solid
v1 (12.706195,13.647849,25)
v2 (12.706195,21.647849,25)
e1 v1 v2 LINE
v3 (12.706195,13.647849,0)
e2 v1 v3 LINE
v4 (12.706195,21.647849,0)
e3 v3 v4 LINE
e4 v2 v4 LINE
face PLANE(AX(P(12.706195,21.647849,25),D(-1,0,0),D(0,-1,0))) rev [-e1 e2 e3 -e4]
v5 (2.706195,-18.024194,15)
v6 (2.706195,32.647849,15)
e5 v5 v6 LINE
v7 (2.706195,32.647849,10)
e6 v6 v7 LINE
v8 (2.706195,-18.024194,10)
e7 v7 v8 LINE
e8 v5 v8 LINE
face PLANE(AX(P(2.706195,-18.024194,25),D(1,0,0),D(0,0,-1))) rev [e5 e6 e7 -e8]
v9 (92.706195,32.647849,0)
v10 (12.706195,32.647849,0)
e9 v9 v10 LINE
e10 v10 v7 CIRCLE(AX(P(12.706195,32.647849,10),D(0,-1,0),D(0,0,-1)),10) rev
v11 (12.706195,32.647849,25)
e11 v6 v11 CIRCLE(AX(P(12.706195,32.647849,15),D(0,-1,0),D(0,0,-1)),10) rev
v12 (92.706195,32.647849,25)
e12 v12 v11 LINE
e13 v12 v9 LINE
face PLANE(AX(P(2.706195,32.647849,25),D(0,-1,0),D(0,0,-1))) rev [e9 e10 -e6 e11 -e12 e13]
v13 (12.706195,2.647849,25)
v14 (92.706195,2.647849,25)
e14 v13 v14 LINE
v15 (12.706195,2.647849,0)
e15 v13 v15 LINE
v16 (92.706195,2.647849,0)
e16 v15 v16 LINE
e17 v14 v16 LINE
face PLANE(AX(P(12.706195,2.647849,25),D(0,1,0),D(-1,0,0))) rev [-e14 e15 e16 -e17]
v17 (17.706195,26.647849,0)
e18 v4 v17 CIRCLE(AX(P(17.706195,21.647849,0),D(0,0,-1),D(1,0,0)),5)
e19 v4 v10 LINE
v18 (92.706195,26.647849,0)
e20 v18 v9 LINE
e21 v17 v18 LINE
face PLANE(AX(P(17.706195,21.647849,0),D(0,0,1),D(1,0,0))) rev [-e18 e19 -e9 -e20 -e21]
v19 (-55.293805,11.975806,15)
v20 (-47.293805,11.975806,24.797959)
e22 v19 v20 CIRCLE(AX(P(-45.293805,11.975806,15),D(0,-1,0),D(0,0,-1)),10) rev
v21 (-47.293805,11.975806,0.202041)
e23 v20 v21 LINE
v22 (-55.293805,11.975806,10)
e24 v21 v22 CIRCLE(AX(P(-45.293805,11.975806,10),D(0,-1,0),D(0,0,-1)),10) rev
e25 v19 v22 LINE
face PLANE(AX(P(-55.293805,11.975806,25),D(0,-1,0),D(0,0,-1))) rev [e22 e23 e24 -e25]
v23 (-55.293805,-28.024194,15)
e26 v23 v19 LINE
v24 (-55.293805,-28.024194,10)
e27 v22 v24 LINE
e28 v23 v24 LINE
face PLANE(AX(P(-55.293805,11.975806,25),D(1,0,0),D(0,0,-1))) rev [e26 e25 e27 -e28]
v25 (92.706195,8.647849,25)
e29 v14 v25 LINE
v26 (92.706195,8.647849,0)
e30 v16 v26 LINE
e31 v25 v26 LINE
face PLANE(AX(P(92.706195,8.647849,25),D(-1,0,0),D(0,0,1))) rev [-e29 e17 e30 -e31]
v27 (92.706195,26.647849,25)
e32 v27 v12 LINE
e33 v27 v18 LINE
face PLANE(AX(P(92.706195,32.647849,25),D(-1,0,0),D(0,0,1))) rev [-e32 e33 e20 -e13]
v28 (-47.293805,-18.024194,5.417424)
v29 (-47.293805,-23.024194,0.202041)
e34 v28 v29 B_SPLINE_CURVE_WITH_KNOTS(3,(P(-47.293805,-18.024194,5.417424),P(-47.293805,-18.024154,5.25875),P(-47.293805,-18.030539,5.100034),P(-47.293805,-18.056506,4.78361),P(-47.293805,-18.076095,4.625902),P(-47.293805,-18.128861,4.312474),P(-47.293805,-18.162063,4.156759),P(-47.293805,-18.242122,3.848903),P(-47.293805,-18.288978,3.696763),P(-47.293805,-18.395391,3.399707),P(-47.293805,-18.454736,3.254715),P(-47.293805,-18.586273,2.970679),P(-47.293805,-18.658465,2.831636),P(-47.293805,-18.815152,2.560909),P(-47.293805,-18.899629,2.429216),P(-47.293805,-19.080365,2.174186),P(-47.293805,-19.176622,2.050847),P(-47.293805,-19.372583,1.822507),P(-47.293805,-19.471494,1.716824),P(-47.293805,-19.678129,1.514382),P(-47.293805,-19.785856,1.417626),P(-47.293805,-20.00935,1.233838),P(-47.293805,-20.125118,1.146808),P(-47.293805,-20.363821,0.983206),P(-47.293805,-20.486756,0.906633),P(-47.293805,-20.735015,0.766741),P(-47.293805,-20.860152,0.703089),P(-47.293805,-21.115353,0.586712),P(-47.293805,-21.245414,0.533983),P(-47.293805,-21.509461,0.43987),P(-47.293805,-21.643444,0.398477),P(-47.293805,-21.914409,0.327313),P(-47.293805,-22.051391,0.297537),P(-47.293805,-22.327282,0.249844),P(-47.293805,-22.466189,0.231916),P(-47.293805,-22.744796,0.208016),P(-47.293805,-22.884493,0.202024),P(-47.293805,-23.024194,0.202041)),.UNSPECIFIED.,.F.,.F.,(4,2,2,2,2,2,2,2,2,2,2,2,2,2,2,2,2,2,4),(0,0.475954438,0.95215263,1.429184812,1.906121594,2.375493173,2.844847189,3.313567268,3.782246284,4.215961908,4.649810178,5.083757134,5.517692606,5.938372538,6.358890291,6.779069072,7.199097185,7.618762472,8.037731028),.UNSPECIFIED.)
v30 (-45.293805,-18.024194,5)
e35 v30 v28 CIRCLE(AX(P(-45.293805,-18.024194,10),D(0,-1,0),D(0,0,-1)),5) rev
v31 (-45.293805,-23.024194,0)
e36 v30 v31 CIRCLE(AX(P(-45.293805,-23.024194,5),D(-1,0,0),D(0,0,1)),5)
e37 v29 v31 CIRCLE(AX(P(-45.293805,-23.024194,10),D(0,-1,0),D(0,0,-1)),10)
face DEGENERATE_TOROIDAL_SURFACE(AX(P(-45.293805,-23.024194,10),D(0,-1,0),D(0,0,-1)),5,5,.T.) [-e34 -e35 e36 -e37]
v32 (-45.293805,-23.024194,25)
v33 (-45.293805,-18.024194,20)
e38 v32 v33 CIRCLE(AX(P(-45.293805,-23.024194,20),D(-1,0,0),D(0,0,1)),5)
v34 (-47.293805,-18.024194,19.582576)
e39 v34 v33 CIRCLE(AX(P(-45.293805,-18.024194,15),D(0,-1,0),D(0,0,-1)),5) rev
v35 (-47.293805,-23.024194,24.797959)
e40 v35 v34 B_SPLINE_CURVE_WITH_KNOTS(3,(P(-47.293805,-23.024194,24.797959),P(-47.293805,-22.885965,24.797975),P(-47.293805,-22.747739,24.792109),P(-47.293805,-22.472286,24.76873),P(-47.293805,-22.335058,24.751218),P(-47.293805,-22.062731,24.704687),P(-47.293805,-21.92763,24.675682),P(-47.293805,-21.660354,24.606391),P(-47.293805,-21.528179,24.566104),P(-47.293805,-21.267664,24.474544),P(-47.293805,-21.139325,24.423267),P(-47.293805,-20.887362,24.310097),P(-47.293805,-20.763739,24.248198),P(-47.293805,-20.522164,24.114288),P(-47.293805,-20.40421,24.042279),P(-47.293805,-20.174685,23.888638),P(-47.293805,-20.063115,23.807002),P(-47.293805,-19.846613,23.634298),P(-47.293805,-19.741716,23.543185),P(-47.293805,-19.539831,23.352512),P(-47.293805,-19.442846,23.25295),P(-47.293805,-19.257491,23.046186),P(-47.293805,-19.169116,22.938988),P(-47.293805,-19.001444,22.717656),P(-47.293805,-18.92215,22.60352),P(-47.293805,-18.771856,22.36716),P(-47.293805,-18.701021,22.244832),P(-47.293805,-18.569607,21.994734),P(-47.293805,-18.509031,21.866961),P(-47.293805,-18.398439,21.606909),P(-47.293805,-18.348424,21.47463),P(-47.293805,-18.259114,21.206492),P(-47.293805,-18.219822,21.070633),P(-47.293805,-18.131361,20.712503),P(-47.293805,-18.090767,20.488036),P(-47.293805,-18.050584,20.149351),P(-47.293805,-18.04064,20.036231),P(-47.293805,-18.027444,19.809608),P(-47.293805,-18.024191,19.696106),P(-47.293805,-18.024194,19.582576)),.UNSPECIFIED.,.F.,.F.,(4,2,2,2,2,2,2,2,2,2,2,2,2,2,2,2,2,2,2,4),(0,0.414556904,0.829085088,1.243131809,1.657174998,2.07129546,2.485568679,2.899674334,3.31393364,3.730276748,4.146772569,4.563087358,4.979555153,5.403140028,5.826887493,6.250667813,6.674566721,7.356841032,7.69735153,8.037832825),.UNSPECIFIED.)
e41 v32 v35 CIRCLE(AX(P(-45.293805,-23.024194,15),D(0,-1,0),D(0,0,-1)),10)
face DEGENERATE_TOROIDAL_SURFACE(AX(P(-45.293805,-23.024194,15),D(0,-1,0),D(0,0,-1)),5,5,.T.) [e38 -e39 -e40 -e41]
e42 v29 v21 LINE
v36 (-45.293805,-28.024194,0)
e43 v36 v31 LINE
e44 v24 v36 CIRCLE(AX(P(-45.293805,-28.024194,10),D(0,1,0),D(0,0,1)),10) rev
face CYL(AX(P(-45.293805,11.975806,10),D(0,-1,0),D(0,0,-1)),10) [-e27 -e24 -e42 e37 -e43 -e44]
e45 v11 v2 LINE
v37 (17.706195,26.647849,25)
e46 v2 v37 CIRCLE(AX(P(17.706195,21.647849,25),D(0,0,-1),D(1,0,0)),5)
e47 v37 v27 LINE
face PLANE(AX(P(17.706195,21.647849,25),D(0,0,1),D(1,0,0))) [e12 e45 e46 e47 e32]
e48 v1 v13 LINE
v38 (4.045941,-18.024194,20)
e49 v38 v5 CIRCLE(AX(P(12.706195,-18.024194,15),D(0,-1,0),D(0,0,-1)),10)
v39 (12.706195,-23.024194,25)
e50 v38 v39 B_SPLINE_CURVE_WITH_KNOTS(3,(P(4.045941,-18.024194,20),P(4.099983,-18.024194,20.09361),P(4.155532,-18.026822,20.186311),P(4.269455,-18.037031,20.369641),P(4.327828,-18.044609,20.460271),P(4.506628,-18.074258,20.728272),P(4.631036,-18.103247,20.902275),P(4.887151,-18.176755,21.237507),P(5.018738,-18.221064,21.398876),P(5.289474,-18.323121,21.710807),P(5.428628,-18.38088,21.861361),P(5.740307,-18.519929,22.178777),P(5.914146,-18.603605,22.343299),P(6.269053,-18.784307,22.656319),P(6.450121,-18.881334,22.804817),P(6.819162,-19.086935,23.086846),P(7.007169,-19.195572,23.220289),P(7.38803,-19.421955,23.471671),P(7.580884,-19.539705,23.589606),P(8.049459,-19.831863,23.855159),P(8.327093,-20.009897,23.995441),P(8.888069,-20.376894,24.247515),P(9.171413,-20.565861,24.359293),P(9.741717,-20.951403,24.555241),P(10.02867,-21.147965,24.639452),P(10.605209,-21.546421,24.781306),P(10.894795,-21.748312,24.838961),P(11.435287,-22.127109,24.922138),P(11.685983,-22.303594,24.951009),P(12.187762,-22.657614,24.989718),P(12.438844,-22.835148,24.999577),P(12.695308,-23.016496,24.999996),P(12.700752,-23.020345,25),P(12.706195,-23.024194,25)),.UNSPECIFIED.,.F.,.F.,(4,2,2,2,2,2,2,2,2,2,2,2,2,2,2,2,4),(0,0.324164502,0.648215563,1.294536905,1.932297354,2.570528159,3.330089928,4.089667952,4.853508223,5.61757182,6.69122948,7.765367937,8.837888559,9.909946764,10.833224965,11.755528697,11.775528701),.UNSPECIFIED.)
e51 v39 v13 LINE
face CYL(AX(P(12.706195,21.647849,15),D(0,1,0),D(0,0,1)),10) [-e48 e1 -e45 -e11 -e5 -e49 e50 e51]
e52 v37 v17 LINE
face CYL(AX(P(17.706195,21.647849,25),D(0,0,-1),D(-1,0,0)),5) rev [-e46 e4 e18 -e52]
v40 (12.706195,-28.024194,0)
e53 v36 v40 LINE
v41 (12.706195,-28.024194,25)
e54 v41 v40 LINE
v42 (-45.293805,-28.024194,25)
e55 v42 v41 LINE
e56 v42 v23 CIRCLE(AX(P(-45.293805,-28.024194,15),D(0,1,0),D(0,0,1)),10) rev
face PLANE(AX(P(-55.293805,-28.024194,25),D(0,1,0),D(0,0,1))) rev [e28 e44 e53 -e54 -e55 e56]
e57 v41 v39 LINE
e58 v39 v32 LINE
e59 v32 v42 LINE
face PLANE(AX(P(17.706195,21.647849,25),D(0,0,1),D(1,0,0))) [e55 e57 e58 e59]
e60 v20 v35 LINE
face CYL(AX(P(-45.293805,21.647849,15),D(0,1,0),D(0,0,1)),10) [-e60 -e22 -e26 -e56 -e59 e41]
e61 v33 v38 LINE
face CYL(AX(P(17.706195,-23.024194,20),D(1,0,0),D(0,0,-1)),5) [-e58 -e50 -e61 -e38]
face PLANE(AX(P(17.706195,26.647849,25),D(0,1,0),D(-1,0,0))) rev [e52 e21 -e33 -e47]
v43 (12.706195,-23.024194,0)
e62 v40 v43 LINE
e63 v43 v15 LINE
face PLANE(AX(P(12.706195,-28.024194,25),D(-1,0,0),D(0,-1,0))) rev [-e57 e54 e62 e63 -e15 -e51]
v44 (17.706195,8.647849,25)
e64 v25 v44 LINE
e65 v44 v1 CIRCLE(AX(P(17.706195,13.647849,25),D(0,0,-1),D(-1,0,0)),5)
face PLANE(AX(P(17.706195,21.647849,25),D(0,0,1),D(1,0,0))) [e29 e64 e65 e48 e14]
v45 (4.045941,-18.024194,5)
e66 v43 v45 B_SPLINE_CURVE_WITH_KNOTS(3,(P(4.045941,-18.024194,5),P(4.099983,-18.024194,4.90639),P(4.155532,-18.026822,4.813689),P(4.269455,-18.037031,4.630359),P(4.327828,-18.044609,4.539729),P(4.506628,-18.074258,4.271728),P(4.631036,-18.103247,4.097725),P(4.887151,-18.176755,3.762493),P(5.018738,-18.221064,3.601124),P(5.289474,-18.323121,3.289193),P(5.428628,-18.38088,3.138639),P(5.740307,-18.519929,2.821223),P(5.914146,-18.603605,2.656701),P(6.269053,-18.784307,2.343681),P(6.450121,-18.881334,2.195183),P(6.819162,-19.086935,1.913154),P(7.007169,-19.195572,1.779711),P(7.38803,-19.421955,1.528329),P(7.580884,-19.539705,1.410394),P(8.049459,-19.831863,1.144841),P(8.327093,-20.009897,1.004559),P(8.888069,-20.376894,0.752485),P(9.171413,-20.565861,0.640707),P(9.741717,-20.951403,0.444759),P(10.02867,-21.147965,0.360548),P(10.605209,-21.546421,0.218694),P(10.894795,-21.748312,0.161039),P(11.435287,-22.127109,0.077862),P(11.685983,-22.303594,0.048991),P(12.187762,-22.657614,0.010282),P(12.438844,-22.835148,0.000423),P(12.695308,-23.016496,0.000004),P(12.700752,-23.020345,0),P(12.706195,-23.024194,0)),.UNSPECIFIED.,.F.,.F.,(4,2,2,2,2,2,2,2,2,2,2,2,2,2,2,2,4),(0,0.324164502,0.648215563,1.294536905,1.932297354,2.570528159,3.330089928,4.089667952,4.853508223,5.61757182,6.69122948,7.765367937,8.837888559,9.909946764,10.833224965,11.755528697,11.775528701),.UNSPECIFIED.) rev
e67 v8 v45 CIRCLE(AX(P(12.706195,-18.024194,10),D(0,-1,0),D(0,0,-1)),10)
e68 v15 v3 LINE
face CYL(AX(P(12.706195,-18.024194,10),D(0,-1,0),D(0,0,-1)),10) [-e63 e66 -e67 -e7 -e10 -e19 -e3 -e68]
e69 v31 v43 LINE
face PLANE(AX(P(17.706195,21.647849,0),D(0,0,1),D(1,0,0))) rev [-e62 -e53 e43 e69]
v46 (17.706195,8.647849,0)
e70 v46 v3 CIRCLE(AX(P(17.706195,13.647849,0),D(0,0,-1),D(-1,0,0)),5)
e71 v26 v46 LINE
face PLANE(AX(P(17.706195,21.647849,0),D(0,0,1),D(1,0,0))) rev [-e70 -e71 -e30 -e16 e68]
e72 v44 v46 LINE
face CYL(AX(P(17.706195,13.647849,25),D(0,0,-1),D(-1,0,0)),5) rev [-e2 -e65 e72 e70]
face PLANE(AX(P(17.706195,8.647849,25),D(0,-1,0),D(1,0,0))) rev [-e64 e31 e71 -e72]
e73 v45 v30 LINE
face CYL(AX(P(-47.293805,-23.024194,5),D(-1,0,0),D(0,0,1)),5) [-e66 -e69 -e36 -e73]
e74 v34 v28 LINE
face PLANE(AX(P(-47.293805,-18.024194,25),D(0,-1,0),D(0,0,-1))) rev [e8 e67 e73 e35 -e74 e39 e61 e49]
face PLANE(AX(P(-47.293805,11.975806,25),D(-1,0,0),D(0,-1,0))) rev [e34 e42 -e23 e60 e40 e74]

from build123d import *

# Parameters (mm, degrees)
EXTRUDE_1_DEPTH = 25
FILLET_2_R      = 10
FILLET_3_R      = 10
FILLET_4_R      = 10
FILLET_6_R      = 5


with BuildPart() as part:
    # 草圖1 → 填料-伸長1 (new body)
    with BuildSketch(Plane.XY):
        with BuildLine():
            Line((-55.29380505, 11.975806452), (-55.29380505, -28.024193548))
            Line((-55.29380505, -28.024193548), (12.70619495, -28.024193548))
            Line((12.70619495, -28.024193548), (12.70619495, 2.647849462))
            Line((12.70619495, 2.647849462), (92.70619495, 2.647849462))
            Line((92.70619495, 2.647849462), (92.70619495, 8.647849462))
            Line((92.70619495, 8.647849462), (17.70619495, 8.647849462))
            ThreePointArc((17.70619495, 8.647849462), (14.170661044, 10.112315556), (12.70619495, 13.647849462))
            Line((12.70619495, 13.647849462), (12.70619495, 21.647849462))
            ThreePointArc((12.70619495, 21.647849462), (14.170661044, 25.183383368), (17.70619495, 26.647849462))
            Line((17.70619495, 26.647849462), (92.70619495, 26.647849462))
            Line((92.70619495, 26.647849462), (92.70619495, 32.647849462))
            Line((92.70619495, 32.647849462), (2.70619495, 32.647849462))
            Line((2.70619495, 32.647849462), (2.70619495, -18.024193548))
            Line((2.70619495, -18.024193548), (-47.29380505, -18.024193548))
            Line((-47.29380505, -18.024193548), (-47.29380505, 11.975806452))
            Line((-47.29380505, 11.975806452), (-55.29380505, 11.975806452))
        make_face()
    extrude(amount=EXTRUDE_1_DEPTH)

    # 圓角2
    fillet_2_edges = [part.edges().sort_by_distance(p)[0] for p in [
        (-55.29380505, -8.024193548, 0),
    ]]
    fillet(fillet_2_edges, radius=FILLET_2_R)

    # 圓角3
    fillet_3_edges = [part.edges().sort_by_distance(p)[0] for p in [
        (-55.29380505, -8.024193548, 25),
    ]]
    fillet(fillet_3_edges, radius=FILLET_3_R)

    # 圓角4
    fillet_4_edges = [part.edges().sort_by_distance(p)[0] for p in [
        (2.70619495, 7.311827957, 0),
        (2.70619495, 7.311827957, 25),
    ]]
    fillet(fillet_4_edges, radius=FILLET_4_R - 0.0001)  # a hair under: the kernel refuses the full size

    # 圓角6
    fillet_6_edges = [part.edges().sort_by_distance(p)[0] for p in [
        (-16.29385505, -18.024193548, 0),
        (-16.29385505, -18.024193548, 25),
        (-46.29889467, -18.024193548, 0.05063847),
        (-46.29889467, -18.024193548, 24.94936153),
    ]]
    fillet(fillet_6_edges, radius=FILLET_6_R)


solid = part.part
